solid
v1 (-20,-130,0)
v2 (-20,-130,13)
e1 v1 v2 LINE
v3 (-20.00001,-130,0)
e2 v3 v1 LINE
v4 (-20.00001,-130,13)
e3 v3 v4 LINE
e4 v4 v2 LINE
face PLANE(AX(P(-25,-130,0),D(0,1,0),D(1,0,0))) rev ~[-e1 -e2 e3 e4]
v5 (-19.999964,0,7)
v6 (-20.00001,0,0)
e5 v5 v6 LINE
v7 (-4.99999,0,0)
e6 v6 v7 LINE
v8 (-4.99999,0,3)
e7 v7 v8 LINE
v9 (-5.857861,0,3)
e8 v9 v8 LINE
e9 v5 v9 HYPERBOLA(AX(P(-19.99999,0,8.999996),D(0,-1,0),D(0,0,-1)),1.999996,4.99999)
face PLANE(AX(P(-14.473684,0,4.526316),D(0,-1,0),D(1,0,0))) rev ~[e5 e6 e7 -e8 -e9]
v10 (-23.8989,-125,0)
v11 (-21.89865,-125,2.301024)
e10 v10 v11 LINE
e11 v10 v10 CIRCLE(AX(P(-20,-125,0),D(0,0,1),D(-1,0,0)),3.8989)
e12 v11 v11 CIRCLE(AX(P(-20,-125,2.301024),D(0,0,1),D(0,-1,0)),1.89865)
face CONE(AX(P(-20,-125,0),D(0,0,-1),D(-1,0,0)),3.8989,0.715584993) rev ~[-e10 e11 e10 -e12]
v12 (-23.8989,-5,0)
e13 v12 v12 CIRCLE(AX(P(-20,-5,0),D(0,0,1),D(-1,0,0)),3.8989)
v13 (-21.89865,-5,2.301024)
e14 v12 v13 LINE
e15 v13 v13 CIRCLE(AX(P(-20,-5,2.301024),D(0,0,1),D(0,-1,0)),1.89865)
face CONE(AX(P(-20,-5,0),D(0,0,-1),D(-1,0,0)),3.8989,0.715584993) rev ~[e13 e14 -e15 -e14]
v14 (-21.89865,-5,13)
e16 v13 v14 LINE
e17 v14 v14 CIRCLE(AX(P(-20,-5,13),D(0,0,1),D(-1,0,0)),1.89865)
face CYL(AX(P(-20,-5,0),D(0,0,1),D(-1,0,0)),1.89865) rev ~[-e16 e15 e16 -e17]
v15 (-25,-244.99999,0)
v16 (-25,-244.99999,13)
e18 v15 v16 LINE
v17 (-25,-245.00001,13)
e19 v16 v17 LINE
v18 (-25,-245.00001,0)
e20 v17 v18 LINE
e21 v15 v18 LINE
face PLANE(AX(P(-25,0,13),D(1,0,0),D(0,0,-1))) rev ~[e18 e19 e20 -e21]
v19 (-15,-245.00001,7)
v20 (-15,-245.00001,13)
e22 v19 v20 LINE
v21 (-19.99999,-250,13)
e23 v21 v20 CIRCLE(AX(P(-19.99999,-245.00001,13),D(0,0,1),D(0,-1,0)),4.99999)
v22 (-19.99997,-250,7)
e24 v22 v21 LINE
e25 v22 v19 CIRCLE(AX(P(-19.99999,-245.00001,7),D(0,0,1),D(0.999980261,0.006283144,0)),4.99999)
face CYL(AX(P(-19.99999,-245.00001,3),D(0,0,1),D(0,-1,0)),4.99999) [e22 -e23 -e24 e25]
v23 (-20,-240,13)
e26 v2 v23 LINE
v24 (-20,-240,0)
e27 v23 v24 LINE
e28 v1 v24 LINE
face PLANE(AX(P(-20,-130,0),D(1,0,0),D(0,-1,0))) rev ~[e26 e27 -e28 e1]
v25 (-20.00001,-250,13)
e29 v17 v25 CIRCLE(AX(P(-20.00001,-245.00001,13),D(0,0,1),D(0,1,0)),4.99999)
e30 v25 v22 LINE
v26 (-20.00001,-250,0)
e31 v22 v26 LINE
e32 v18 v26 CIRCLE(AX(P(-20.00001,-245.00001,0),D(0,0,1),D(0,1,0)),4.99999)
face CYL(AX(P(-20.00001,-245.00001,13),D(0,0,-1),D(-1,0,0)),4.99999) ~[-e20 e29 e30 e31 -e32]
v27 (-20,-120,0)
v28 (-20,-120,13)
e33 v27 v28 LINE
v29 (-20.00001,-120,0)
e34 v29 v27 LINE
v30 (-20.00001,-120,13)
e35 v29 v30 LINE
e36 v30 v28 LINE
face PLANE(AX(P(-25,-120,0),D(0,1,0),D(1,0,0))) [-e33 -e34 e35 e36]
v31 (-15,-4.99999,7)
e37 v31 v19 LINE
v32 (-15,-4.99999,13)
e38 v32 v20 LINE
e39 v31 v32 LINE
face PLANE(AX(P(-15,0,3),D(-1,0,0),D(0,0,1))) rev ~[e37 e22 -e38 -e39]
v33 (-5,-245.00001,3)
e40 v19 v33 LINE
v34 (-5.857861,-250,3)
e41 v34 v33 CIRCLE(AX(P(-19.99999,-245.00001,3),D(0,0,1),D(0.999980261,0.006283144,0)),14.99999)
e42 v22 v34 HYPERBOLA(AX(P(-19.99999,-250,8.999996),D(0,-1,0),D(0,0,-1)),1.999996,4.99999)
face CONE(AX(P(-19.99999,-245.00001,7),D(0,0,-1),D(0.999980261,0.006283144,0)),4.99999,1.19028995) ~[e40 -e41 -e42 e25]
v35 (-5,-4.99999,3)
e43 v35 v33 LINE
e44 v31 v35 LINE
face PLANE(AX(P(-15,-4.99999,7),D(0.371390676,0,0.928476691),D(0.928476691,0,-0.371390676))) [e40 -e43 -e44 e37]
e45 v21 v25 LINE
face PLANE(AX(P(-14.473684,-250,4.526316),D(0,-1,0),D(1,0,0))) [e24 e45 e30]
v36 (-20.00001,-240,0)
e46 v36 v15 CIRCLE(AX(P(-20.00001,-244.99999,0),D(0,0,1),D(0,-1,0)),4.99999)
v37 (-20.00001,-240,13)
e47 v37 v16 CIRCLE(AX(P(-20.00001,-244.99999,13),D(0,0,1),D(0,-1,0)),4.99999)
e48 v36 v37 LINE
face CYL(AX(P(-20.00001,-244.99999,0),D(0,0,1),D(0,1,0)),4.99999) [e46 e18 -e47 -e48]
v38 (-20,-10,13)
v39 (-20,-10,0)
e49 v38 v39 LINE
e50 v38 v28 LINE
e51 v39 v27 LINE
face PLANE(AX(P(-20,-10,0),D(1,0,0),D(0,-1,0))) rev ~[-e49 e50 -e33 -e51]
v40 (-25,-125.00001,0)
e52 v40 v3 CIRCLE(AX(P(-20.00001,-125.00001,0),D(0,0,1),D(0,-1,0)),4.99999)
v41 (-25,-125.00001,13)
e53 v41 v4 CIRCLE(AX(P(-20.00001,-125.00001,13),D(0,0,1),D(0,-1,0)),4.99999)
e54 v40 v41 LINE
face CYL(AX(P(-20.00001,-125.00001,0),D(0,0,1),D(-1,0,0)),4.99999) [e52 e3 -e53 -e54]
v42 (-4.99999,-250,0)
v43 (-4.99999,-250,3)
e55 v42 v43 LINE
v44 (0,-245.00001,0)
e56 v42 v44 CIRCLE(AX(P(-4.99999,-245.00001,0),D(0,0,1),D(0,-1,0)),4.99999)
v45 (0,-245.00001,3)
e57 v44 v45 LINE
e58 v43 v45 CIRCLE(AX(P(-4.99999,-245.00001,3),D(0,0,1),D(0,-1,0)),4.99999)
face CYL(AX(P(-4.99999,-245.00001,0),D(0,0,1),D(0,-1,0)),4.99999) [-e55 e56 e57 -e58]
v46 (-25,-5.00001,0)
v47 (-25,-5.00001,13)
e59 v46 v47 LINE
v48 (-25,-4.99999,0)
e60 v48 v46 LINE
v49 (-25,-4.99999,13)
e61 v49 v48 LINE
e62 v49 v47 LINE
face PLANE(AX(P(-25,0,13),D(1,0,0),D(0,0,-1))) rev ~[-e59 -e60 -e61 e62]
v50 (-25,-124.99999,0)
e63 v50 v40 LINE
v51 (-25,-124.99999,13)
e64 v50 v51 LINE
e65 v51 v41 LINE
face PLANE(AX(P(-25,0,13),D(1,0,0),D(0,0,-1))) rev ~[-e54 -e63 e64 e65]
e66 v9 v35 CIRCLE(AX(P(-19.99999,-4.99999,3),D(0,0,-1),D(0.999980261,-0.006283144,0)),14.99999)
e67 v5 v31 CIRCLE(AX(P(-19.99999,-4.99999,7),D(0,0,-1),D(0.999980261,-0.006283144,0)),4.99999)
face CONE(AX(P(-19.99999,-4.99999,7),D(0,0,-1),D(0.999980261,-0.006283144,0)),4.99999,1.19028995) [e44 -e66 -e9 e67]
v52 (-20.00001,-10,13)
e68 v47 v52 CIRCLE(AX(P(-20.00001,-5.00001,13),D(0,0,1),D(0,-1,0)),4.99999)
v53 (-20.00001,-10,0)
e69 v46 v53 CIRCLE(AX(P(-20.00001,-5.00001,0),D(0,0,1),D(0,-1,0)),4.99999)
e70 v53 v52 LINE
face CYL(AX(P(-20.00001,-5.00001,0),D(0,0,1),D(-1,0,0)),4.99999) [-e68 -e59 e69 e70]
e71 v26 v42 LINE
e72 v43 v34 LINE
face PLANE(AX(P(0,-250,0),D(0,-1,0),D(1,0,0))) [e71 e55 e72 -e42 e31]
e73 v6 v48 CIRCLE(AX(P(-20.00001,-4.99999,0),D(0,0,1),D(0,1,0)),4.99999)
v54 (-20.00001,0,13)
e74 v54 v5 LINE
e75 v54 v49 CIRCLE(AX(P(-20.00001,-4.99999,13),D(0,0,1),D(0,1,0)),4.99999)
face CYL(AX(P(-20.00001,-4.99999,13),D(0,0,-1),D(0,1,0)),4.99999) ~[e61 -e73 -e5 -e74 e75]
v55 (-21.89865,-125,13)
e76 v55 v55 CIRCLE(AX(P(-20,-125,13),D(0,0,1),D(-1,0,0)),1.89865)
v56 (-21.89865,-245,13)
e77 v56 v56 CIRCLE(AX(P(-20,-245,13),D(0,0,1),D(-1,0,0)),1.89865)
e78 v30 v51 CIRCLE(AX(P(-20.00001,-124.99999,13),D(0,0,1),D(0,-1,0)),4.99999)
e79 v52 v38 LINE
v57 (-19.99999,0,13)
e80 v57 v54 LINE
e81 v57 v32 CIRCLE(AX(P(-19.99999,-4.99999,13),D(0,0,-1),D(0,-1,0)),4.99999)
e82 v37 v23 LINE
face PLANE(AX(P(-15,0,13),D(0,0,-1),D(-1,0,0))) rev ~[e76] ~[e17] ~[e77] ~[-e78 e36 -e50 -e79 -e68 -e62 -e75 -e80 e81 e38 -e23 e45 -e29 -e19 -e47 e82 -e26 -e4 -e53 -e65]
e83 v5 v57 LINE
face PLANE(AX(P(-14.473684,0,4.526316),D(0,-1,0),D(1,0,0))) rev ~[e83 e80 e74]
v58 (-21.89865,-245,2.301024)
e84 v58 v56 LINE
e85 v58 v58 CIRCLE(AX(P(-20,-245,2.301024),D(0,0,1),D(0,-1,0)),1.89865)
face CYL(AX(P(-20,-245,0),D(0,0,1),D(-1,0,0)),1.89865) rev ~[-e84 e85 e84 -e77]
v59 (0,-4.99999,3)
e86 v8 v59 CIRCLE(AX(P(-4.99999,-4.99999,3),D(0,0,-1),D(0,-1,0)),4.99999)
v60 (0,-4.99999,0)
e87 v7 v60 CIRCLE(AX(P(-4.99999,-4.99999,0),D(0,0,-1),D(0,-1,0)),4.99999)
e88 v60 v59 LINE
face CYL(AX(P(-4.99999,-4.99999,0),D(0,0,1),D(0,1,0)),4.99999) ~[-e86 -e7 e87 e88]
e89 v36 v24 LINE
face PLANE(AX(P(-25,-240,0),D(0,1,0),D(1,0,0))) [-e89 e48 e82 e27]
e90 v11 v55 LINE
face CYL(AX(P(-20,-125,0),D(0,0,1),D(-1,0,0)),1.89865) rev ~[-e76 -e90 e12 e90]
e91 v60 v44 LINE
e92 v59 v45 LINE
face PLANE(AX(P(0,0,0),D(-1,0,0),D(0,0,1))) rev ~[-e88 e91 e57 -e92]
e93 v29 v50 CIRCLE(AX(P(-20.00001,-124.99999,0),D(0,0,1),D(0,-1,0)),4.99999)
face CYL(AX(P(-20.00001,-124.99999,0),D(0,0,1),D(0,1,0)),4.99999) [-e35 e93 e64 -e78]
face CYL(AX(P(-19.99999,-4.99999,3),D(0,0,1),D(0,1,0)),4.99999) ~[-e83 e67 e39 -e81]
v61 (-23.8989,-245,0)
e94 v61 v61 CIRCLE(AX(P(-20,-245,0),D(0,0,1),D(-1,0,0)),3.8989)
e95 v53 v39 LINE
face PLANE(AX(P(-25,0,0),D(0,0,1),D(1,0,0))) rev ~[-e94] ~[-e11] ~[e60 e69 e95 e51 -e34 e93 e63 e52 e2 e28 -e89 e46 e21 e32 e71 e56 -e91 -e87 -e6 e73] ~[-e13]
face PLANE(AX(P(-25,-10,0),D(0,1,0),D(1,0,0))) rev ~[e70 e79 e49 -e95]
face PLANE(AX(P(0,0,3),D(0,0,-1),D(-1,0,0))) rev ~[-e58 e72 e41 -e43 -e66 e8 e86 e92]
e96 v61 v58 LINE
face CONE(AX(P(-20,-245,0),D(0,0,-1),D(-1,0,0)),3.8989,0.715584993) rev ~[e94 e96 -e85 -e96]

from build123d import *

# Parameters (mm, degrees)
F1_DEPTH       = 250
F3_D           = 3.7973
F3_CSINK_D     = 7.7978
F3_CSINK_ANGLE = 82
F2_W           = 5
F2_H           = 110
F4_DEPTH       = 13.001
F5_R           = 4.99999
F6_T1_DEPTH    = 240.00002
F6_T6_ANGLE    = 359.64
F6_T12_ANGLE   = 359.64


# Not quite as in the source:
# - a fillet or chamfer that OpenCascade refuses, or shapes differently, is made with other operations: its cross-section is extruded or revolved along the edge and cut away or added
# - a fillet or chamfer is up to 0.001 mm smaller than in the source, because OpenCascade refuses the exact size


with BuildPart() as f1:
    # F0 (on Front) → F1 (new body)
    with BuildSketch(Plane.XZ):
        Polygon((-15, 13), (-25, 13), (-25, 0), (0, 0), (0, 3), (-15, 3), align=None)
    extrude(amount=F1_DEPTH)

    # F3 (through all)
    with Locations(Plane(origin=(0, 0, 0), x_dir=(1, 0, 0), z_dir=(0, 0, -1))):
        with Locations((-20, 245), (-20, 125), (-20, 5)):
            CounterSinkHole(F3_D / 2, F3_CSINK_D / 2, counter_sink_angle=F3_CSINK_ANGLE)

    # F2 (on face) → F4 (cut, through all)
    with BuildSketch(Plane(origin=(0, 0, 0), x_dir=(1, 0, 0), z_dir=(0, 0, -1))):
        with Locations((-22.5, 185)):
            Rectangle(F2_W, F2_H)
        with Locations((-22.5, 65)):
            Rectangle(F2_W, F2_H)
    extrude(amount=-F4_DEPTH, mode=Mode.SUBTRACT)

    # F5 (radius 5 in the source; OpenCascade refuses exactly that, so slightly less here)
    f5_edges = [f1.edges().sort_by_distance(p)[0] for p in [
        (-25, 0, 6.5),
        (-25, -10, 6.5),
        (-25, -120, 6.5),
        (-25, -130, 6.5),
        (-25, -240, 6.5),
        (-25, -250, 6.5),
        (-15, -250, 8),
        (0, -250, 1.5),
        (-15, 0, 8),
        (0, 0, 1.5),
    ]]
    fillet(f5_edges, radius=F5_R)

    # F6: chamfer of 4 x 10 on 1 edges, made by hand

    # F6_s2 → F6_t1 (join)
    with BuildSketch(Plane.XZ.offset(4.99999)):
        Polygon((-15, 7), (-5, 3), (-15, 3), align=None)
    extrude(amount=F6_T1_DEPTH)


with BuildPart() as f6_tool4:
    # F6_s5 → F6_t6 (revolve)
    with BuildSketch(Plane(origin=(-0.0322045944, -5.1254529469, 0), x_dir=(0, 0, 1), z_dir=(0.006283144, 0.9999802609, 0))):
        Polygon((7, -14.9681895603), (3, -4.9681895603), (3, -14.9681895603), align=None)
    revolve(axis=Axis((-19.99999, -4.99999, 3), (0, 0, -1)), revolution_arc=F6_T6_ANGLE)

    split(bisect_by=Plane.XZ, keep=Keep.TOP)

    split(bisect_by=Plane.YZ.offset(-20), keep=Keep.TOP)


with BuildPart() as f1_1:
    add(f1.part)

    # F6_t3: union F6_tool4
    add(f6_tool4.part)


with BuildPart() as f6_tool10:
    # F6_s11 → F6_t12 (revolve)
    with BuildSketch(Plane(origin=(1.538550391, -244.8646775786, 0), x_dir=(0, 0, 1), z_dir=(0.006283144, -0.9999802609, 0))):
        Polygon((7, 16.5389755517), (3, 6.5389755517), (3, 16.5389755517), align=None)
    revolve(axis=Axis((-19.99999, -245.00001, 3), (0, 0, 1)), revolution_arc=F6_T12_ANGLE)

    split(bisect_by=Plane.XZ.offset(250), keep=Keep.BOTTOM)

    split(bisect_by=Plane.YZ.offset(-20), keep=Keep.TOP)


with BuildPart() as f1_2:
    add(f1_1.part)

    # F6_t9: union F6_tool10
    add(f6_tool10.part)


solid = f1_2.part
